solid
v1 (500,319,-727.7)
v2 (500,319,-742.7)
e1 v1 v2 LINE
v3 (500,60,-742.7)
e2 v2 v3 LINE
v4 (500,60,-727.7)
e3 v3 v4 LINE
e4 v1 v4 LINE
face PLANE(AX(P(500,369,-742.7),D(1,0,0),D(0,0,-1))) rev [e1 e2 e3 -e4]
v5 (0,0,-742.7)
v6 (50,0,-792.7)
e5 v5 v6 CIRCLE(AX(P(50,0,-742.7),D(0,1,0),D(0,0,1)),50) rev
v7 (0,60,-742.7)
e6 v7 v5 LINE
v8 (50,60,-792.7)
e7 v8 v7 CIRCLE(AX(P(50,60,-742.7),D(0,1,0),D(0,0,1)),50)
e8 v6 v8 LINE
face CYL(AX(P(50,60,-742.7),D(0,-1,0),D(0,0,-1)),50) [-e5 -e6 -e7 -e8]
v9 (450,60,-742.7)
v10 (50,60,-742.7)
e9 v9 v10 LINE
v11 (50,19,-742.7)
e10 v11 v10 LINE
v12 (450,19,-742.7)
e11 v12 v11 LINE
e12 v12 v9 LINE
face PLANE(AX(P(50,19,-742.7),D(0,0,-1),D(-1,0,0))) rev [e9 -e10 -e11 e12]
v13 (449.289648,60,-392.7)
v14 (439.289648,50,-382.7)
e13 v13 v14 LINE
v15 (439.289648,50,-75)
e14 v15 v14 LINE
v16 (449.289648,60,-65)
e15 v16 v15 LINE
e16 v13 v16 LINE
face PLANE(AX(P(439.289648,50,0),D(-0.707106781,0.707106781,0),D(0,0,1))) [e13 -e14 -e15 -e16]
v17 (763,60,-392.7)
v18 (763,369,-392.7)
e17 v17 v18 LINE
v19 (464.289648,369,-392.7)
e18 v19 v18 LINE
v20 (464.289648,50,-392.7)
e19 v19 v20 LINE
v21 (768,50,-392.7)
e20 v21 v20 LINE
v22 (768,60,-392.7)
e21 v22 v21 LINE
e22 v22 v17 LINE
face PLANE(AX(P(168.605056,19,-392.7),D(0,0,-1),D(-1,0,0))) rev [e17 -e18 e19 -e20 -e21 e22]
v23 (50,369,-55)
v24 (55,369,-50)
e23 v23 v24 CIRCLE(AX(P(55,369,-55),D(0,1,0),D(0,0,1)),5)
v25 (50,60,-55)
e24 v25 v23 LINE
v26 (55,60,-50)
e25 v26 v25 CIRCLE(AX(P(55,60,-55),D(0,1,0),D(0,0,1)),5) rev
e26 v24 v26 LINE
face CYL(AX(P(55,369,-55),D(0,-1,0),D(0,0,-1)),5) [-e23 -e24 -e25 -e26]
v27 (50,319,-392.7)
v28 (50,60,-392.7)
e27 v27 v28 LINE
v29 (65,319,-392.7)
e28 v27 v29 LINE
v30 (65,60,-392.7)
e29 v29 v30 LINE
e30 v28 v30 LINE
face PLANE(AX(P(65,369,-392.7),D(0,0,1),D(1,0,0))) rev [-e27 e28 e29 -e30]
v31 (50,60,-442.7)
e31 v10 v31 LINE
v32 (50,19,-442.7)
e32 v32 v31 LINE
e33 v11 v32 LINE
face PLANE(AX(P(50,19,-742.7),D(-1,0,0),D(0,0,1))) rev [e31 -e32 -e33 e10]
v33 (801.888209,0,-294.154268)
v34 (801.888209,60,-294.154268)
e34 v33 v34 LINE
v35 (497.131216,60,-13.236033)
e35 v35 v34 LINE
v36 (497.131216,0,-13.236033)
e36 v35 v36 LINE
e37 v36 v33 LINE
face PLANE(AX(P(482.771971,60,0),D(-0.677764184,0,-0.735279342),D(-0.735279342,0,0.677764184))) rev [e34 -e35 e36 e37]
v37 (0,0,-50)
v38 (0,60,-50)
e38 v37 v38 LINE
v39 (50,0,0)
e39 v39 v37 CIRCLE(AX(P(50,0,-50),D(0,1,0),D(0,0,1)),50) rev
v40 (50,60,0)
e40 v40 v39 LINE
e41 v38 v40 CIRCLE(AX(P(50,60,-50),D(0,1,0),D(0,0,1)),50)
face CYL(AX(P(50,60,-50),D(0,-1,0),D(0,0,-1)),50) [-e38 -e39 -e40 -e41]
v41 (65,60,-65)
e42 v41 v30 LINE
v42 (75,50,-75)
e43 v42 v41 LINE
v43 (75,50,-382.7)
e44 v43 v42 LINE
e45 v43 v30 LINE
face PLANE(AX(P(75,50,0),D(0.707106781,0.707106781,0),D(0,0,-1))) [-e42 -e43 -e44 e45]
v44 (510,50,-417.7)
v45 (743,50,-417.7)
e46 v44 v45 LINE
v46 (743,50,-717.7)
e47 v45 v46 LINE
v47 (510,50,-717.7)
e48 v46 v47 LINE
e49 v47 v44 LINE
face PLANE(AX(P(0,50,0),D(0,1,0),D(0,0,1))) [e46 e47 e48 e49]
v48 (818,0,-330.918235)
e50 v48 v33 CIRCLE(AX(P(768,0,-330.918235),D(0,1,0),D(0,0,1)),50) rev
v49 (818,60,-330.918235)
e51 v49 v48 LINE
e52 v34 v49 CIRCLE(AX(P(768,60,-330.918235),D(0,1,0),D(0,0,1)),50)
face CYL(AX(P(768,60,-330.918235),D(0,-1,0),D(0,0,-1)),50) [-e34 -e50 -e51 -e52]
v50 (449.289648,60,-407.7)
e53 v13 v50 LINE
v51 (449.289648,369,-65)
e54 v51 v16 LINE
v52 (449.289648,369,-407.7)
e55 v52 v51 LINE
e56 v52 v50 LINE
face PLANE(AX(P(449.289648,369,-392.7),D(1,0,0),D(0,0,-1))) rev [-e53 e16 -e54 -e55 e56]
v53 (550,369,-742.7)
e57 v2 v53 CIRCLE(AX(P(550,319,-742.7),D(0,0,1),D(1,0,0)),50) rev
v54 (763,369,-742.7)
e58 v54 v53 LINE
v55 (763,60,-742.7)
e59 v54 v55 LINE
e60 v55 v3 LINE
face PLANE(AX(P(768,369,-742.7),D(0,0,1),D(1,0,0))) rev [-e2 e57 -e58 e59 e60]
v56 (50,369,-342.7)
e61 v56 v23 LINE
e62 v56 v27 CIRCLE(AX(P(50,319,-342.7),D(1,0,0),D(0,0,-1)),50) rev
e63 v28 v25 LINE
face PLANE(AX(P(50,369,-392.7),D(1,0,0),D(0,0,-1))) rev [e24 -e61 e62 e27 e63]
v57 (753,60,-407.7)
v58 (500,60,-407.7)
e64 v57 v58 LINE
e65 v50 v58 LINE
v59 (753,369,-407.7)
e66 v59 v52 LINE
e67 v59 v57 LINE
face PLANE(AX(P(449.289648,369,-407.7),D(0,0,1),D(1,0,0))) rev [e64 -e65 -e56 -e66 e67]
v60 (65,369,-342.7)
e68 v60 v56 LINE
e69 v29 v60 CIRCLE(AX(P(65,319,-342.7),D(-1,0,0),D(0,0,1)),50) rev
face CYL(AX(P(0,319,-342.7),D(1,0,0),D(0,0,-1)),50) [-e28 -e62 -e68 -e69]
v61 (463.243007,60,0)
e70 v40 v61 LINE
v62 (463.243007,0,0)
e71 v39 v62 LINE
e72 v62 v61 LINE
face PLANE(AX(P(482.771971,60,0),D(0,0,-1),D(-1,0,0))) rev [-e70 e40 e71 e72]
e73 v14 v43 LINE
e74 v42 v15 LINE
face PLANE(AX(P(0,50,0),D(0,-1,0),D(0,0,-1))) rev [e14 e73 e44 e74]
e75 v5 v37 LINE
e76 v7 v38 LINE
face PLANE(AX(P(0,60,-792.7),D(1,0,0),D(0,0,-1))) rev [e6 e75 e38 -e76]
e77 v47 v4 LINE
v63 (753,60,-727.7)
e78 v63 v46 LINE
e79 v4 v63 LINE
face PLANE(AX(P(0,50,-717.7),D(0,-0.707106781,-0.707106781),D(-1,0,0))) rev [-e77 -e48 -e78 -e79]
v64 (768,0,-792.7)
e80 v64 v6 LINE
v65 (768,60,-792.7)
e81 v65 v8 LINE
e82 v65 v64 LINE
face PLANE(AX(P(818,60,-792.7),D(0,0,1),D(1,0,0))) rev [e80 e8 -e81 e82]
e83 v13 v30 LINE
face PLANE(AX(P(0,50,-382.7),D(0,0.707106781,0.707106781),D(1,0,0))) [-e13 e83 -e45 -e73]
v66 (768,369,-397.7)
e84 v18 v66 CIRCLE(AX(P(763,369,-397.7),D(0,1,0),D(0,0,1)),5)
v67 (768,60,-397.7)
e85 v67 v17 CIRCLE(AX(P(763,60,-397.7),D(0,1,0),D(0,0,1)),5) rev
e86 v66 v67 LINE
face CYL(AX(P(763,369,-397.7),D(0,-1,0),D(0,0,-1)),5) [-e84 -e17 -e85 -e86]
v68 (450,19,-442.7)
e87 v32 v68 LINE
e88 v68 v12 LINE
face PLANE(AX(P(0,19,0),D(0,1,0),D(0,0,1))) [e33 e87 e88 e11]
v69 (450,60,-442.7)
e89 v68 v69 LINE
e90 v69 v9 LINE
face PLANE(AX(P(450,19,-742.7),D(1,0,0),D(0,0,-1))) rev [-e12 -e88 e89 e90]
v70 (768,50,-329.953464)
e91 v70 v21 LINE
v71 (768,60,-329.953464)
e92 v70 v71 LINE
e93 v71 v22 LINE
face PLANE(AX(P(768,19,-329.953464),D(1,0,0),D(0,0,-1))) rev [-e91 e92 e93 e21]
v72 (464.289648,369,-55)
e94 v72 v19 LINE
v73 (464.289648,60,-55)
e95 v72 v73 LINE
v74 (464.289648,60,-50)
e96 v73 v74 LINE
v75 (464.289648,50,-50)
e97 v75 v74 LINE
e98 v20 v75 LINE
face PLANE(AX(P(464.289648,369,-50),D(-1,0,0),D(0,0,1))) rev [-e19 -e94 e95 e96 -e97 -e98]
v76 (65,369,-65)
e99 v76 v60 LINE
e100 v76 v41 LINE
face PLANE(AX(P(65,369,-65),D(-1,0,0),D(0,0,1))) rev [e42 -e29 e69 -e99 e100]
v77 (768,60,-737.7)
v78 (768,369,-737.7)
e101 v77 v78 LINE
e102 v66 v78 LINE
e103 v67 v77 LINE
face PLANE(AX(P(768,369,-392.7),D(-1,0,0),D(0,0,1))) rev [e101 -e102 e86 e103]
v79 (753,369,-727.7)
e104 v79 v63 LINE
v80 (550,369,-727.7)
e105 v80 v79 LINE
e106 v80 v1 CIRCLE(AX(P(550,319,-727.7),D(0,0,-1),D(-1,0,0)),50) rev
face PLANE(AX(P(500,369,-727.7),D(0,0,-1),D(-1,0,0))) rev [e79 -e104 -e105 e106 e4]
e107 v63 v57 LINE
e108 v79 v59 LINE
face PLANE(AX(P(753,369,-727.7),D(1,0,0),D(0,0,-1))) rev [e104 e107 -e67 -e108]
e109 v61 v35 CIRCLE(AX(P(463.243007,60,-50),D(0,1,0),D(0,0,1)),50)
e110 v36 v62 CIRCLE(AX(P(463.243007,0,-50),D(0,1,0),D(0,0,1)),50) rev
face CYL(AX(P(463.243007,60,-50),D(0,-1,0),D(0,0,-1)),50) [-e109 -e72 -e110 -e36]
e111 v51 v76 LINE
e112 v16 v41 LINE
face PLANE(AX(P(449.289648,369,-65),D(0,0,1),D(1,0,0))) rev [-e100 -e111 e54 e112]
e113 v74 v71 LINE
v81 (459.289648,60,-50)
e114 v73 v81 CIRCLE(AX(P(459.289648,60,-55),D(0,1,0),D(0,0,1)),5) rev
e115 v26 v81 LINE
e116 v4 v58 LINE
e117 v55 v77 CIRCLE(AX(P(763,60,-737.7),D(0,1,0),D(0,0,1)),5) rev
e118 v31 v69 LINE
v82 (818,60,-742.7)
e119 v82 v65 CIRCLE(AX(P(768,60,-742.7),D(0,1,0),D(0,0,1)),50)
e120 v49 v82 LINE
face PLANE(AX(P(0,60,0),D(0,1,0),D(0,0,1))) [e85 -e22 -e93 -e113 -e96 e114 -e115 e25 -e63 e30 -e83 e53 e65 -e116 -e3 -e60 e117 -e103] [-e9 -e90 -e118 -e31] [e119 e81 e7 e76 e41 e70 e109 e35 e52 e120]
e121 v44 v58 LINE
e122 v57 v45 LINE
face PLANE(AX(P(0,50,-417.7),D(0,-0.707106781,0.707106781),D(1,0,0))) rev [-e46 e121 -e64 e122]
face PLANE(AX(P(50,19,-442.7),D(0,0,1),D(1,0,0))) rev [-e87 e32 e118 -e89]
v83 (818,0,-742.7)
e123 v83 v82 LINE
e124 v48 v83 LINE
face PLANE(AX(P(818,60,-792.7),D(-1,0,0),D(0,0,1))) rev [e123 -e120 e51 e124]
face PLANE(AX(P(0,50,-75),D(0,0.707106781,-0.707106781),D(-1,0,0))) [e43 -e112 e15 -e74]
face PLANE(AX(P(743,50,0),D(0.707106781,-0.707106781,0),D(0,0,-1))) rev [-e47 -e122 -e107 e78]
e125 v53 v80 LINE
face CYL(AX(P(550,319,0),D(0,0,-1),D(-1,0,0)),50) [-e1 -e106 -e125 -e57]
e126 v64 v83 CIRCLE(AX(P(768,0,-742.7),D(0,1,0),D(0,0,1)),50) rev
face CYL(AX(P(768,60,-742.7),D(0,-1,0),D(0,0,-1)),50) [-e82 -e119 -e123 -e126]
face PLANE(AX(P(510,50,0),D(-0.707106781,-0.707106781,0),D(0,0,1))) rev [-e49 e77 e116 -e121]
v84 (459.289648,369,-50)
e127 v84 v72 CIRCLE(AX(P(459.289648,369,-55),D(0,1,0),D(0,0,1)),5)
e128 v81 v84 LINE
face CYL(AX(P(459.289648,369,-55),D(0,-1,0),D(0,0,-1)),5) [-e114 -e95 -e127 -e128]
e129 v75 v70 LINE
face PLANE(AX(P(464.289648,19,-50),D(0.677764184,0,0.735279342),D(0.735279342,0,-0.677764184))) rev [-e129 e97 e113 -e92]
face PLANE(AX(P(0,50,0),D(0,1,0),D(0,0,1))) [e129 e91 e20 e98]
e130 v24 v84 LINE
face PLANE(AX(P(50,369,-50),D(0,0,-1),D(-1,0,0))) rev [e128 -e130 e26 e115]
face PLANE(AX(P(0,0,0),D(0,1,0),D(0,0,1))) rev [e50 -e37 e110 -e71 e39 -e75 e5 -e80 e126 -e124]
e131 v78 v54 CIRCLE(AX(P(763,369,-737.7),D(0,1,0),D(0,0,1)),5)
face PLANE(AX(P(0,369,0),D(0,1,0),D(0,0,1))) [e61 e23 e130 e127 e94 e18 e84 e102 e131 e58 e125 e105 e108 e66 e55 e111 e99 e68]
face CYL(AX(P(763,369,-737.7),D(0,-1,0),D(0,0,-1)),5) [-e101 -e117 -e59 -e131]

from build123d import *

# Parameters (mm, degrees)
BOSS_EXTRUDE1_DEPTH = 60
SKETCH3_W           = 400
SKETCH3_H           = 300
CUT_EXTRUDE1_DEPTH  = 41
BOSS_EXTRUDE2_DEPTH = 350
BOSS_EXTRUDE3_DEPTH = 350
FILLET1_R           = 50
FILLET2_R           = 50
SKETCH6_W           = 253
SKETCH6_H           = 320
SKETCH6_W_2         = 384.289648178
SKETCH6_H_2         = 327.7
BOSS_EXTRUDE4_DEPTH = 31
CHAMFER5_SIZE       = 10
FILLET3_R           = 5


with BuildPart() as part:
    # Sketch1 → Boss-Extrude1 (new body)
    with BuildSketch(Plane(origin=(0, 0, 0), x_dir=(1, 0, 0), z_dir=(0, 1, 0))):
        Polygon((818, 792.7), (0, 792.7), (0, 0), (482.77197137, 0), (818, 309.005759394), align=None)
    extrude(amount=BOSS_EXTRUDE1_DEPTH)

    # Sketch3 → Cut-Extrude1 (cut)
    with BuildSketch(Plane(origin=(0, 60, 0), x_dir=(1, 0, 0), z_dir=(0, 1, 0))):
        with Locations((250, 592.7)):
            Rectangle(SKETCH3_W, SKETCH3_H)
        Polygon((168.605055776, 392.7), (500, 392.7), (500, 678.249343647), (500, 742.7), (768, 742.7), (768, 329.953464166), (464.289648178, 50), (50, 50), (50, 392.7), align=None)
    extrude(amount=-CUT_EXTRUDE1_DEPTH, mode=Mode.SUBTRACT)

    # Sketch4 → Boss-Extrude2 (add)
    with BuildSketch(Plane(origin=(0, 19, 0), x_dir=(1, 0, 0), z_dir=(0, 1, 0))):
        Polygon((464.289648178, 50), (464.289648178, 392.7), (449.289648178, 392.7), (449.289648178, 65), (65, 65), (65, 392.7), (50, 392.7), (50, 50), align=None)
    extrude(amount=BOSS_EXTRUDE2_DEPTH)

    # Sketch5 → Boss-Extrude3 (add)
    with BuildSketch(Plane(origin=(0, 19, 0), x_dir=(1, 0, 0), z_dir=(0, 1, 0))):
        Polygon((768, 392.7), (768, 742.7), (500, 742.7), (500, 727.7), (753, 727.7), (753, 407.7), (500, 407.7), (449.289648178, 407.7), (449.289648178, 392.7), align=None)
    extrude(amount=BOSS_EXTRUDE3_DEPTH)

    # Fillet1
    fillet1_edges = [part.edges().sort_by_distance(p)[0] for p in [
        (57.5, 369, -392.7),
        (500, 369, -735.2),
    ]]
    fillet(fillet1_edges, radius=FILLET1_R)

    # Fillet2
    fillet2_edges = [part.edges().sort_by_distance(p)[0] for p in [
        (0, 30, 0),
        (0, 30, -792.7),
        (818, 30, -792.7),
        (818, 30, -309.005759394),
        (482.77197137, 30, 0),
    ]]
    fillet(fillet2_edges, radius=FILLET2_R)

    # Sketch6 → Boss-Extrude4 (add)
    with BuildSketch(Plane(origin=(0, 19, 0), x_dir=(1, 0, 0), z_dir=(0, 1, 0))):
        Polygon((768, 392.7), (464.289648178, 392.7), (464.289648178, 50), (768, 329.953464166), align=None)
        with Locations((626.5, 567.7)):
            Rectangle(SKETCH6_W, SKETCH6_H)
        with Locations((257.144824089, 228.85)):
            Rectangle(SKETCH6_W_2, SKETCH6_H_2)
    extrude(amount=BOSS_EXTRUDE4_DEPTH)

    # Chamfer5
    chamfer5_edges = [part.edges().sort_by_distance(p)[0] for p in [
        (753, 50, -567.7),
        (626.5, 50, -727.7),
        (500, 50, -567.7),
        (626.5, 50, -407.7),
        (449.289648178, 50, -228.85),
        (257.144824089, 50, -392.7),
        (65, 50, -228.85),
        (257.144824089, 50, -65),
    ]]
    chamfer(chamfer5_edges, length=CHAMFER5_SIZE - 0.0001)  # a hair under: the kernel refuses the full size

    # Fillet3
    fillet3_edges = [part.edges().sort_by_distance(p)[0] for p in [
        (50, 214.5, -50),
        (464.289648178, 214.5, -50),
        (768, 214.5, -392.7),
        (768, 214.5, -742.7),
    ]]
    fillet(fillet3_edges, radius=FILLET3_R)


solid = part.part
